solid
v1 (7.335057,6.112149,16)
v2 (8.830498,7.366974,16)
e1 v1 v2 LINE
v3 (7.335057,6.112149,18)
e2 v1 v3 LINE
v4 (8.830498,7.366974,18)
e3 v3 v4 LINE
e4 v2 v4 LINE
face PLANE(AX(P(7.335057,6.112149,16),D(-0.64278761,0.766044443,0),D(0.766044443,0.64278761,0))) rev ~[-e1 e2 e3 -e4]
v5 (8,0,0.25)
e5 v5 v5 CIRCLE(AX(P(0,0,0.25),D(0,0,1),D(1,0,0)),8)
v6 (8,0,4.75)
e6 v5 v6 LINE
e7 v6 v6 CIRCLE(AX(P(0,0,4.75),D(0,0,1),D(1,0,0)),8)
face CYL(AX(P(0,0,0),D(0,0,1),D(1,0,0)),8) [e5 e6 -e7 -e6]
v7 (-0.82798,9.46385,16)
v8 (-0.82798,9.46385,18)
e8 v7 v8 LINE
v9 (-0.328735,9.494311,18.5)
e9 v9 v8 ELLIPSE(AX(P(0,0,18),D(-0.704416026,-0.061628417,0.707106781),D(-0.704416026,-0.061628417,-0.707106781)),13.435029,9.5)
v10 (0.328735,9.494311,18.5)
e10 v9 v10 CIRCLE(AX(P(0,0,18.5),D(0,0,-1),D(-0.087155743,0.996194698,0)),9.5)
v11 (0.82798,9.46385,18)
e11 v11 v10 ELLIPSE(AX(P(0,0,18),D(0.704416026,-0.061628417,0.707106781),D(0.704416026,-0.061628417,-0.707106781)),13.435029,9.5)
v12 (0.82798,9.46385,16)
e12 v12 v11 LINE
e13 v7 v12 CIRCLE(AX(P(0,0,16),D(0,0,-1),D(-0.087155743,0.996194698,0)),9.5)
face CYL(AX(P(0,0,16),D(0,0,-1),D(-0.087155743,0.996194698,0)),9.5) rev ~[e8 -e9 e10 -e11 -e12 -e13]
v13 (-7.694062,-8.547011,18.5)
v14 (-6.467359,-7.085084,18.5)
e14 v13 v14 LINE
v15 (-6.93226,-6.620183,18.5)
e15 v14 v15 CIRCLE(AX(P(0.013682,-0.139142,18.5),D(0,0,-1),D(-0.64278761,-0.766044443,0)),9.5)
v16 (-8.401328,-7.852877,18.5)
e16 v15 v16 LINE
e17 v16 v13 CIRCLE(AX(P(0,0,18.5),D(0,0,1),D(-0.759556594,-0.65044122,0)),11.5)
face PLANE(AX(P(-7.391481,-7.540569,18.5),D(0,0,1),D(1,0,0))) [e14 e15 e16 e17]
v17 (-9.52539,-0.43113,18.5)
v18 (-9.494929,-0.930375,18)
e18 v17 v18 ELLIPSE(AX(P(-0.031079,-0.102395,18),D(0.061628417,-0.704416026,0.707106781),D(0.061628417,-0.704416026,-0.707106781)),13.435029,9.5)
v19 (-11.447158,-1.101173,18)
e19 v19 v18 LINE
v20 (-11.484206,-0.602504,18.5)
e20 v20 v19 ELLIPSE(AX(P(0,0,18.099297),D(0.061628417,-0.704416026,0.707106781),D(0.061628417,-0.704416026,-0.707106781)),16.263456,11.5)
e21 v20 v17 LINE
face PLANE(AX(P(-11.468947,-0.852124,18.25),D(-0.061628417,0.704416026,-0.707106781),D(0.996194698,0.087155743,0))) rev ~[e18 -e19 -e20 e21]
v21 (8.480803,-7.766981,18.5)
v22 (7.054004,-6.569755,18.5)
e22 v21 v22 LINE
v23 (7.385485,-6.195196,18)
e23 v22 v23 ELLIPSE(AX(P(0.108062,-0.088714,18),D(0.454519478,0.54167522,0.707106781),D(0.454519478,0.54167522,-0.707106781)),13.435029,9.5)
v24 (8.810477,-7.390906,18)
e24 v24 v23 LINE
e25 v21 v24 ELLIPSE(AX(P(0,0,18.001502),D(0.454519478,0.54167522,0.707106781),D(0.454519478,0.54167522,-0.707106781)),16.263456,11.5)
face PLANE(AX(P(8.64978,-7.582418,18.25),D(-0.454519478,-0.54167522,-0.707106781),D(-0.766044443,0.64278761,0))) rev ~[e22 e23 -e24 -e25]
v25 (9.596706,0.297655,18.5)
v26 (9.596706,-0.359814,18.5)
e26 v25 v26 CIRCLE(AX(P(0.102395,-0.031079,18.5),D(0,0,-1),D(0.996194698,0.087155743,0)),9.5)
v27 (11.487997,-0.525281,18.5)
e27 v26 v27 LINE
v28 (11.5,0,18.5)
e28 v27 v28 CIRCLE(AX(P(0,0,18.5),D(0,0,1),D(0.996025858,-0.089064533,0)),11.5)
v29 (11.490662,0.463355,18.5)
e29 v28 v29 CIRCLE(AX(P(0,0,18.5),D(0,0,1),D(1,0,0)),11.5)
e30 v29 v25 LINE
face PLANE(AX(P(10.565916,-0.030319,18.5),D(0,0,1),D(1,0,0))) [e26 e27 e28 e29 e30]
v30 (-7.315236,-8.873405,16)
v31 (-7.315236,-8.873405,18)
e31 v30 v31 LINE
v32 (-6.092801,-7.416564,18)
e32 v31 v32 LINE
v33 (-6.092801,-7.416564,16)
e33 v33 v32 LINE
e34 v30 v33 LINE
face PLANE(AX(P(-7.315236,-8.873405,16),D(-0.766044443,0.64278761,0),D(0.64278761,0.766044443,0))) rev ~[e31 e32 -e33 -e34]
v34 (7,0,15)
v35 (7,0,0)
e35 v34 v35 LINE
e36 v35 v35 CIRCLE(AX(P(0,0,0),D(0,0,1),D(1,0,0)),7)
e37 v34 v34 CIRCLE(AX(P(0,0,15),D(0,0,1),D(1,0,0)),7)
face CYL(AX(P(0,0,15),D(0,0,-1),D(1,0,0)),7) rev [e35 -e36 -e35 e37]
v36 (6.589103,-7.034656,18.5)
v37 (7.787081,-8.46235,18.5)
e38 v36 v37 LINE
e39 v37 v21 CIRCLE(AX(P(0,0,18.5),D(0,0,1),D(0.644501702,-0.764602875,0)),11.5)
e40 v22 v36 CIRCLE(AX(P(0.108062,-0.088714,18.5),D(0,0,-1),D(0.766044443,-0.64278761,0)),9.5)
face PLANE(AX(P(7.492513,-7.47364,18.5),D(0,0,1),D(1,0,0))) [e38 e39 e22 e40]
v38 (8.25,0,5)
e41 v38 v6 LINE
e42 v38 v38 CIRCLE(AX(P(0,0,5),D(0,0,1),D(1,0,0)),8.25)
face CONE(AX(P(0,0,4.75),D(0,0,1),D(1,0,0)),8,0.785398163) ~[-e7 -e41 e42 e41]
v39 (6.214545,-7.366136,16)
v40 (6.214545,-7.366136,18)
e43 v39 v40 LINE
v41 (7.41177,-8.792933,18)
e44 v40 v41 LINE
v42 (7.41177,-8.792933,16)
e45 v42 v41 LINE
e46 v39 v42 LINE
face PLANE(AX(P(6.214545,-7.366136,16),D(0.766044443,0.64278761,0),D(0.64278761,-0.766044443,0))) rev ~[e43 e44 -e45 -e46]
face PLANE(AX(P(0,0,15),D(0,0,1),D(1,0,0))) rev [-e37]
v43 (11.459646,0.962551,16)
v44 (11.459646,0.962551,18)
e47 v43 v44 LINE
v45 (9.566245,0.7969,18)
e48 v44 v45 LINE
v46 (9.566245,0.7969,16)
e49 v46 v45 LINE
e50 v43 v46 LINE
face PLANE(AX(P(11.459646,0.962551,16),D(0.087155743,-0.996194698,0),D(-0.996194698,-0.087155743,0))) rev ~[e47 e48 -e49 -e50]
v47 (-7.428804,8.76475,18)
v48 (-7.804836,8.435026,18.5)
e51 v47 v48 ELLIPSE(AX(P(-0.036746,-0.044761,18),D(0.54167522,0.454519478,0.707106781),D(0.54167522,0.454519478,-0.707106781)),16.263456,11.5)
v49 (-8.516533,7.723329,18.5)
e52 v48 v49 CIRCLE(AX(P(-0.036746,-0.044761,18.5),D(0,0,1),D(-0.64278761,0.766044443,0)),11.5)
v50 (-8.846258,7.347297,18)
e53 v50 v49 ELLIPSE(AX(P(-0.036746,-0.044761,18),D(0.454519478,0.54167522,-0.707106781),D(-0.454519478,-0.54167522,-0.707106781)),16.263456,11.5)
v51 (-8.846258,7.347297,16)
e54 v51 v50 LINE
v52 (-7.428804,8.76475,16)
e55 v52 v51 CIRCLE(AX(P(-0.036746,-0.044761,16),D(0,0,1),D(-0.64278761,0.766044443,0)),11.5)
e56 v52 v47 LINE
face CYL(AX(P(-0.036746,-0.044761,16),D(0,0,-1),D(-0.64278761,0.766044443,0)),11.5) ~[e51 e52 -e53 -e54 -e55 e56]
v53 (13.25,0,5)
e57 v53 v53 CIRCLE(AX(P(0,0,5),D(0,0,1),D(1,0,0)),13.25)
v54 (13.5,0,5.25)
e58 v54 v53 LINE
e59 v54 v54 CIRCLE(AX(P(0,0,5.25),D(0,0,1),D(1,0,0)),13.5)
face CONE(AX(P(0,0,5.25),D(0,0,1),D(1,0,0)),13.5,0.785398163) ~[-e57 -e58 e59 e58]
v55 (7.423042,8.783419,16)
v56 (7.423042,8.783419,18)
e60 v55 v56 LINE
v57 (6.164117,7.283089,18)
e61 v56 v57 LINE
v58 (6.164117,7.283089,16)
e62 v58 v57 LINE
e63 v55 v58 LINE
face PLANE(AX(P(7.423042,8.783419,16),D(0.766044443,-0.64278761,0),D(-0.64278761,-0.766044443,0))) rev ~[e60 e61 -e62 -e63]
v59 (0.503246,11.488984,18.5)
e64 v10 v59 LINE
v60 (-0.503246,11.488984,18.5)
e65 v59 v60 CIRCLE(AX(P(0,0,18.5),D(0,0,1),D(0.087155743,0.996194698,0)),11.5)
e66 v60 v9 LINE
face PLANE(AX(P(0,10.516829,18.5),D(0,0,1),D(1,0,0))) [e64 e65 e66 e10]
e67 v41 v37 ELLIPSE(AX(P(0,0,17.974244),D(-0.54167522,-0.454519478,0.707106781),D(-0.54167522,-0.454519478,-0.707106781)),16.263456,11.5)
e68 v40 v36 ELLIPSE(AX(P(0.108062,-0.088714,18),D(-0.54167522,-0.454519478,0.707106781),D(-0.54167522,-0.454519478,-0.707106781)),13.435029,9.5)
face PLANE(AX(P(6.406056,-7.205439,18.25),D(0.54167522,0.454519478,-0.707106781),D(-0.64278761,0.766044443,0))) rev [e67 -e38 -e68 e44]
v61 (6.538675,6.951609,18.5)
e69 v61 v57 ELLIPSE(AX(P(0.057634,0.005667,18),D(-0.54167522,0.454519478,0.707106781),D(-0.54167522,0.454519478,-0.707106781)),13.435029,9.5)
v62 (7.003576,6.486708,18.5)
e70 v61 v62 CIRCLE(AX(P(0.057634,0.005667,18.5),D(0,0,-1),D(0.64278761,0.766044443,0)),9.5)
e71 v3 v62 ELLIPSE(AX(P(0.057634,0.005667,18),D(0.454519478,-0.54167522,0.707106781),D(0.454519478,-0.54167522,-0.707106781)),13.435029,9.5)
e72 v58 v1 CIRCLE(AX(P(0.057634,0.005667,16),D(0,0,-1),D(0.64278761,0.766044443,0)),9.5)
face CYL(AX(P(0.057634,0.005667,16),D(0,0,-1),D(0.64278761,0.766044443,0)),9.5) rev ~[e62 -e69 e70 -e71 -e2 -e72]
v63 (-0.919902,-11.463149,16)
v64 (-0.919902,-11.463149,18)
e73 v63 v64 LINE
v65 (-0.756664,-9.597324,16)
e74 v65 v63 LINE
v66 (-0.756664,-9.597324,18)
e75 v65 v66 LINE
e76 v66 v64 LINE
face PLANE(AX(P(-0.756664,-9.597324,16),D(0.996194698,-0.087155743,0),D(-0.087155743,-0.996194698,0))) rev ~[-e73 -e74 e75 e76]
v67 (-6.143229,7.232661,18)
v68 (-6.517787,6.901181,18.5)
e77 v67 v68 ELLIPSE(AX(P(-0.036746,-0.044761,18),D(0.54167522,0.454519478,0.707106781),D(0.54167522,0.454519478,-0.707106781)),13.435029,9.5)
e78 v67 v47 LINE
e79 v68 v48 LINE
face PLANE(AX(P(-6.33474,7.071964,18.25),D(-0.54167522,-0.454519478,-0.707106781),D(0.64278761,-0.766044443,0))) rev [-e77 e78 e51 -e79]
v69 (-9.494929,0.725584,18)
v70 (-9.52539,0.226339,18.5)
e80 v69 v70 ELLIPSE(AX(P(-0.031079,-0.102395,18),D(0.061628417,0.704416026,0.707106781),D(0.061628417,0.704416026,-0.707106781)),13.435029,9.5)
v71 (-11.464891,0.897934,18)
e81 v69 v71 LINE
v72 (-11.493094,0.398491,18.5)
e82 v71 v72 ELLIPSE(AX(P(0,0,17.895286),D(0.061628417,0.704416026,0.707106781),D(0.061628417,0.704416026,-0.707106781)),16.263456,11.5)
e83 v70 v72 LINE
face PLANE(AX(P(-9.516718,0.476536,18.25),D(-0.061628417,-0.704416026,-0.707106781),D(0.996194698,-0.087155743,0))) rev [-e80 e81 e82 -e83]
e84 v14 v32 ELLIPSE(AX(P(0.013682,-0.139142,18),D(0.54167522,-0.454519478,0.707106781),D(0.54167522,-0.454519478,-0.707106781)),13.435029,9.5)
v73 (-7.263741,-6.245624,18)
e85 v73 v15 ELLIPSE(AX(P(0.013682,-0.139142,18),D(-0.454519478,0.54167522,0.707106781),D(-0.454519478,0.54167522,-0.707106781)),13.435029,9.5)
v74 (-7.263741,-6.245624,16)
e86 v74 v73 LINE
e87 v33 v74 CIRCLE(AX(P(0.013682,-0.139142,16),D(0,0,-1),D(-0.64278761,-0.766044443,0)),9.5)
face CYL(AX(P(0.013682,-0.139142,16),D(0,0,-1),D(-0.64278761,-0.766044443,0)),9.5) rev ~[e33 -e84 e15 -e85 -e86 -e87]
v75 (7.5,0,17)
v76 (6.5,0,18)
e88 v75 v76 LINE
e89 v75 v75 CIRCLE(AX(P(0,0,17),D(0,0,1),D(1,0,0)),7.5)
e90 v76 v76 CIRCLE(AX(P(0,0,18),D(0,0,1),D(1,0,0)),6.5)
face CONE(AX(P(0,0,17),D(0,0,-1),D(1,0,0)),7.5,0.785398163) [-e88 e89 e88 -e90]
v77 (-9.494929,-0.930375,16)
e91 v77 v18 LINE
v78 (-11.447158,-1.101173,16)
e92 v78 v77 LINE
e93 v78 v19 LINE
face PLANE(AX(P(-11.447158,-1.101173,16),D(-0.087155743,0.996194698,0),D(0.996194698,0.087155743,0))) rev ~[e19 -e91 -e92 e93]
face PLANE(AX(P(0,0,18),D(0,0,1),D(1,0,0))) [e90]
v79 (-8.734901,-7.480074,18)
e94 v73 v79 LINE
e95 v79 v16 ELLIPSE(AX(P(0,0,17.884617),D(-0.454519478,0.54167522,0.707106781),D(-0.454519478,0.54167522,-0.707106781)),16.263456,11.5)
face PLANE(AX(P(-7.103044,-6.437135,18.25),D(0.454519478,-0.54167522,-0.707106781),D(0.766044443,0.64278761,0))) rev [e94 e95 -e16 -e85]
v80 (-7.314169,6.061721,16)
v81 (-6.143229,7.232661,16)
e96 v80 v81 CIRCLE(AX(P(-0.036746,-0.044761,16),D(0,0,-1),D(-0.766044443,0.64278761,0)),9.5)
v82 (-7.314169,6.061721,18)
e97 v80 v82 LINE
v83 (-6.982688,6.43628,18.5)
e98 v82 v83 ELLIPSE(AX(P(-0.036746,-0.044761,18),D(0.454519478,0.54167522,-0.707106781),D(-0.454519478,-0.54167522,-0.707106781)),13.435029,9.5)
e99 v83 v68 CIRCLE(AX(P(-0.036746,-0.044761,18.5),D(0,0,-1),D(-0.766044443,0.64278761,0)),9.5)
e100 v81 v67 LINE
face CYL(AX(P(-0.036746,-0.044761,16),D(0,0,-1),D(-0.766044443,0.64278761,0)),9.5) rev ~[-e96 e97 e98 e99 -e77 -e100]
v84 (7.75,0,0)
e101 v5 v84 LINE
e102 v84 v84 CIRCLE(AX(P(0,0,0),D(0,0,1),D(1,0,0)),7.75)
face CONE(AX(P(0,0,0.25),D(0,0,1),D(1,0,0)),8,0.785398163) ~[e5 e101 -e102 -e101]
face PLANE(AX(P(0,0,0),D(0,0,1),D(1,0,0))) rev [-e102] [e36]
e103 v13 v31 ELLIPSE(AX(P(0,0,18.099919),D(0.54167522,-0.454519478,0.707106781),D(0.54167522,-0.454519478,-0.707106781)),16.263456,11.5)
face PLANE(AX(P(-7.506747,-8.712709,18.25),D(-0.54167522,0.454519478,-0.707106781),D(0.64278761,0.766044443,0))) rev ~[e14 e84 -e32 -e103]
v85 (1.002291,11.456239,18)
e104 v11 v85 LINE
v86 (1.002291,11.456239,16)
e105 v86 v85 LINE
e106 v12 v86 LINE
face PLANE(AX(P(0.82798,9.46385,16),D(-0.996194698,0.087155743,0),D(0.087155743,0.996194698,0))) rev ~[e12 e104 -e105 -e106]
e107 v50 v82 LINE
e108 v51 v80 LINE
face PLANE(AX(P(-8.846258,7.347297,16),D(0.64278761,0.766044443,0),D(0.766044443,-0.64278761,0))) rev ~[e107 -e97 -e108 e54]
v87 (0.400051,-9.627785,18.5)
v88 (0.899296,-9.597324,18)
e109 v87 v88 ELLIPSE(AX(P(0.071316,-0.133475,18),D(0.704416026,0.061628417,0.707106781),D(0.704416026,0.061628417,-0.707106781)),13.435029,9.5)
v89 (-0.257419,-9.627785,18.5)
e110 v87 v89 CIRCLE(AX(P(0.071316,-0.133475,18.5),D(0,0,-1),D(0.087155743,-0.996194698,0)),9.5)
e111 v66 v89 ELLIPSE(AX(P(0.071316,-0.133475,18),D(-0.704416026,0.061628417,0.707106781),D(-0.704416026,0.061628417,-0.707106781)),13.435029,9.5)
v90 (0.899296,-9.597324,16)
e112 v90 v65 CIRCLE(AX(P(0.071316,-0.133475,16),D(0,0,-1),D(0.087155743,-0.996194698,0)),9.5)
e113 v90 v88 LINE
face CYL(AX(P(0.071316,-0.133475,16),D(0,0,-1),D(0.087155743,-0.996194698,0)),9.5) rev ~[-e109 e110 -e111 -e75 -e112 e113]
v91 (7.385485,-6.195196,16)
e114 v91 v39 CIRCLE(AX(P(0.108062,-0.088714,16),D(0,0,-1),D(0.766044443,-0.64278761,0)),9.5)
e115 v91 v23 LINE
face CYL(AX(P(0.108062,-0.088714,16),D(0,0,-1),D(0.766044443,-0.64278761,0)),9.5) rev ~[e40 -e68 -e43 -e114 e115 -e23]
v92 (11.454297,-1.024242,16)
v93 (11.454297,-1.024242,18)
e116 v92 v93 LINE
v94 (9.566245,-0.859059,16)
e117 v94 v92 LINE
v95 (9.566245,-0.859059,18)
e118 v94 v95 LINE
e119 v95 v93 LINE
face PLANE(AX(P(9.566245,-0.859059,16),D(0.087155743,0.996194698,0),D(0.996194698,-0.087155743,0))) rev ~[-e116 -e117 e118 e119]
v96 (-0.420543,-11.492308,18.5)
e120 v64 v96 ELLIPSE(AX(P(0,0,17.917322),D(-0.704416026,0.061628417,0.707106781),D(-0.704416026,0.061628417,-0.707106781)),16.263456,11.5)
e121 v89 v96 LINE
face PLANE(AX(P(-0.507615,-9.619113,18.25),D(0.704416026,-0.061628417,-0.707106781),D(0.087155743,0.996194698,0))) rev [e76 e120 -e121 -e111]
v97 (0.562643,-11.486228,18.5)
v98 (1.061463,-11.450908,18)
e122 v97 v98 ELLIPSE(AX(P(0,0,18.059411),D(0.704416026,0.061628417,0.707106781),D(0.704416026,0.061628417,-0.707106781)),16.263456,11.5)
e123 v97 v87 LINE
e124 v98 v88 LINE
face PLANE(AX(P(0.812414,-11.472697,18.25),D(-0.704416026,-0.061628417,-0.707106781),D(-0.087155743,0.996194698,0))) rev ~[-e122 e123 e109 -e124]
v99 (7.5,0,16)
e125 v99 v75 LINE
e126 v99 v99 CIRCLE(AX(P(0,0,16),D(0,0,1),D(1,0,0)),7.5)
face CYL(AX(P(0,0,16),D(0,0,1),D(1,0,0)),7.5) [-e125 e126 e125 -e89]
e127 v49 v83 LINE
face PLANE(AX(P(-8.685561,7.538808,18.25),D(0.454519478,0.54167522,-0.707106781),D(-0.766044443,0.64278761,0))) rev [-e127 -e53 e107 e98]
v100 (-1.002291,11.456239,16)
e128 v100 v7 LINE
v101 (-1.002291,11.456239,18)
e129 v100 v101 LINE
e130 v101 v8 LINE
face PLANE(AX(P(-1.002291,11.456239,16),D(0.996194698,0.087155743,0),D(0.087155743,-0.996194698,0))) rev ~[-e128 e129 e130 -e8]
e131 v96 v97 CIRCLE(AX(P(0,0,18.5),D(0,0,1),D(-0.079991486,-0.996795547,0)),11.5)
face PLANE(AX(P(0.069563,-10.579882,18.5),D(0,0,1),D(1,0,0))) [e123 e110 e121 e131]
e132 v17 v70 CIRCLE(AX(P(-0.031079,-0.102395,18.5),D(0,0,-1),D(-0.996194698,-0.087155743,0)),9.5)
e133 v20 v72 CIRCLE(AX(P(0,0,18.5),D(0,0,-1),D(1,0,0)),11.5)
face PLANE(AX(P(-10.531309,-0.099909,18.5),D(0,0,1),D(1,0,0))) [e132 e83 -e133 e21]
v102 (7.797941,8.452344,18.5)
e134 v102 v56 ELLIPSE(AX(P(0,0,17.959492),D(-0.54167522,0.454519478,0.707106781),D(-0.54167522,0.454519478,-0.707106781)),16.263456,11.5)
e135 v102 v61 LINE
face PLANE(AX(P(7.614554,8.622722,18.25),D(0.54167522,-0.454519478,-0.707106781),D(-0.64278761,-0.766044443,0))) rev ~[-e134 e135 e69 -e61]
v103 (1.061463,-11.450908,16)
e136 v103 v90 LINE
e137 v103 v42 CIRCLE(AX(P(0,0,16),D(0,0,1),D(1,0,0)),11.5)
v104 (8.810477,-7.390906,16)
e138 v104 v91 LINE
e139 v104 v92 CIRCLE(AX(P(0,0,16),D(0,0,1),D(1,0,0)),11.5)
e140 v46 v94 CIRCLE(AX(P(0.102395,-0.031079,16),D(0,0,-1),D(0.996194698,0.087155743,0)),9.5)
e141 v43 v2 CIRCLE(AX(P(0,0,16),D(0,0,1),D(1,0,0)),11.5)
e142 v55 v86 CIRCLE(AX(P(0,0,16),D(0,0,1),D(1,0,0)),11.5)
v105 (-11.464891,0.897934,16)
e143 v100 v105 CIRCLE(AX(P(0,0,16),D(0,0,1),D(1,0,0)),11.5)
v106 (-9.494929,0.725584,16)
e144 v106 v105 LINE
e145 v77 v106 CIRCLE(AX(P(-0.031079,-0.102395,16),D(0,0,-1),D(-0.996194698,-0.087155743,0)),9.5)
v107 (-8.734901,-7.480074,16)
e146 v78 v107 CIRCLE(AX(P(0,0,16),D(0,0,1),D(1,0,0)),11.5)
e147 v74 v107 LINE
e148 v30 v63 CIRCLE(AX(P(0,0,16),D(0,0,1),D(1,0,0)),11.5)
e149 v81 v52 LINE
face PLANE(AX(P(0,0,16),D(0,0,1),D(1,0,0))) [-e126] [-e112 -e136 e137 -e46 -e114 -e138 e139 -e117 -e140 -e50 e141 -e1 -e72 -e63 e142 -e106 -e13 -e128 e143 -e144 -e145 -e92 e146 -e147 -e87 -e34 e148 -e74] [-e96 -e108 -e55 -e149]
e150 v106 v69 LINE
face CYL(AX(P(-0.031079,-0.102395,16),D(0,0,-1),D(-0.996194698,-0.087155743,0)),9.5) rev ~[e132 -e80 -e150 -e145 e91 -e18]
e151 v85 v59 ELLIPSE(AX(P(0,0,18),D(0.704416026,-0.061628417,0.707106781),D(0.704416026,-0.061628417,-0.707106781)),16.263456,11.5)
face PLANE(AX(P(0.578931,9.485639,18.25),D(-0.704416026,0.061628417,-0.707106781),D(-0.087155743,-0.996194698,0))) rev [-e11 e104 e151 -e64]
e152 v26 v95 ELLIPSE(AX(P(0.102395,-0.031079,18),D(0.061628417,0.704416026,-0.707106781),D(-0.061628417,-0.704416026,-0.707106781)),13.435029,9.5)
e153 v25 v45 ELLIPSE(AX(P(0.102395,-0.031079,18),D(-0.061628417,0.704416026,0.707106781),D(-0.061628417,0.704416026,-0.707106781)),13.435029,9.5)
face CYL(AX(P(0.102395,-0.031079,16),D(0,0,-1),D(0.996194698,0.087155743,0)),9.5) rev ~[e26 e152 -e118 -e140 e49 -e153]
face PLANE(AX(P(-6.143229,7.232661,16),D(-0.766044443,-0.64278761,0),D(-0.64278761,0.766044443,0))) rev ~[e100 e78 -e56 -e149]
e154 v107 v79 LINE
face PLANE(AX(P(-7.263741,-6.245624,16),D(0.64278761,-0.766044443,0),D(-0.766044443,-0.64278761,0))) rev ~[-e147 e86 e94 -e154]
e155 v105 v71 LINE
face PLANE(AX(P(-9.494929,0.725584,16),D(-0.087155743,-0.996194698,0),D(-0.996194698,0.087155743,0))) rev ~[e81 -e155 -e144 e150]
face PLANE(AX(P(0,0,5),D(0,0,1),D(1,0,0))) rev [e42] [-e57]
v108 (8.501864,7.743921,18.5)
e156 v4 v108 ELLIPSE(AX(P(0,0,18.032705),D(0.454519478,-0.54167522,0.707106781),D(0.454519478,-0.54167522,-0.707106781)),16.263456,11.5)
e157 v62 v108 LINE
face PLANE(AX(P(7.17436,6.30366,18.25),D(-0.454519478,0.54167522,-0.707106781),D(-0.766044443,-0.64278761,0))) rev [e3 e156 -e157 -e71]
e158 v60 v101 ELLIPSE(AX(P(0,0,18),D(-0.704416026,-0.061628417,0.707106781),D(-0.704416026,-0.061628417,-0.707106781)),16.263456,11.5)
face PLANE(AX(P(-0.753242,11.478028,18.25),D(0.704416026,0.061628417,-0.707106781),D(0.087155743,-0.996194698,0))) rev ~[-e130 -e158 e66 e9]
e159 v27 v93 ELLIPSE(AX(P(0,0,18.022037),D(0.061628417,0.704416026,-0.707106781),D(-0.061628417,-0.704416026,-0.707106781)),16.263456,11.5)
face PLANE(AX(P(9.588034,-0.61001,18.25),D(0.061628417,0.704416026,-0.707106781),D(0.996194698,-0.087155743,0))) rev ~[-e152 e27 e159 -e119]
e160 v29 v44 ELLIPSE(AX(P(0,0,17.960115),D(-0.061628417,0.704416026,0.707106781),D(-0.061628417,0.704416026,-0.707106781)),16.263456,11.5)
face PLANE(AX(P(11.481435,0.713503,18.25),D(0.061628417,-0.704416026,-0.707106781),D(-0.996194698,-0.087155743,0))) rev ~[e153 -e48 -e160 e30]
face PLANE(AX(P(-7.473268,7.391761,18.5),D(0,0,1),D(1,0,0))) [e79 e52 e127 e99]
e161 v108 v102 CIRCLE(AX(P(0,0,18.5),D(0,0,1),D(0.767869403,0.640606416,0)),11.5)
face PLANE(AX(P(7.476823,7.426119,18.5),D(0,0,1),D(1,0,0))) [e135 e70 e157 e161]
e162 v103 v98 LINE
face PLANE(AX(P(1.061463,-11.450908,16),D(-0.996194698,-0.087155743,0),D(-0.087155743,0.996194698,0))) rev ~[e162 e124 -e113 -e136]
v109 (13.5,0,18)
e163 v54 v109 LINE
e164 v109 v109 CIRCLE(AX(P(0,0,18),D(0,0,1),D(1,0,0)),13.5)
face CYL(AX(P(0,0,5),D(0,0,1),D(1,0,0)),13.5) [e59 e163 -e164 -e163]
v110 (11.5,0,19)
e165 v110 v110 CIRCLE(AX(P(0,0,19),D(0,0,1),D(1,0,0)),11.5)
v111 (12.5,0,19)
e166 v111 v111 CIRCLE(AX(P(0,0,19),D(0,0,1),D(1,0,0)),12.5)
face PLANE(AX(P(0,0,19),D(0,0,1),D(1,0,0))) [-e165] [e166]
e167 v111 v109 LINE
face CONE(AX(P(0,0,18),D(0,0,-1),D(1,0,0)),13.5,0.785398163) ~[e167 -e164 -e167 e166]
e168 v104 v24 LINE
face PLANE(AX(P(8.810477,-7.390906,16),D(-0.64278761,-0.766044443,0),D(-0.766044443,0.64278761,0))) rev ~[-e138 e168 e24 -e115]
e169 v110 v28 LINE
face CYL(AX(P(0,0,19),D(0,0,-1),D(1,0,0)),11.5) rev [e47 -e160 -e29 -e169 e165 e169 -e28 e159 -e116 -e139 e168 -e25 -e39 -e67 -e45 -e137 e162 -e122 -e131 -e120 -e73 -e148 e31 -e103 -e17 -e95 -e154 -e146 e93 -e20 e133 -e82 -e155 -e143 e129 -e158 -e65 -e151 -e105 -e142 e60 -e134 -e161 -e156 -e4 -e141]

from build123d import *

# Parameters (mm, degrees)
F3_DEPTH = 2.5
F4_SIZE  = 1
F5_SIZE  = 0.5
F6_SIZE  = 0.25


# Not quite as in the source:
# - a feature names something its author has since deleted; it is built from what else it names


with BuildPart() as f1:
    # F0 (on Front) → F1 (revolve)
    with BuildSketch(Plane.XZ):
        Polygon((7, 15), (7, 0), (8, 0), (8, 5), (13.5, 5), (13.5, 19), (11.5, 19), (11.5, 16), (7.5, 16), (7.5, 18), (0, 18), (0, 15), align=None)
    revolve(axis=Axis((0, 0, 16.5), (0, 0, 1)))

    # F2 (on face) → F3 (join)
    with BuildSketch(Plane.XY.offset(16)):
        with BuildLine():
            Line((0.8279795561, 9.4638496319), (1.0022910416, 11.4562390281))
            ThreePointArc((1.0022910416, 11.4562390281), (0, 11.5), (-1.0022910416, 11.4562390281))
            Line((-1.0022910416, 11.4562390281), (-0.8279795561, 9.4638496319))
            ThreePointArc((-0.8279795561, 9.4638496319), (0, 9.5), (0.8279795561, 9.4638496319))
        make_face()
        with BuildLine():
            ThreePointArc((8.8304981344, 7.3669737816), (8.1575715841, 8.1058019869), (7.4230424297, 8.7834185308))
            Line((7.4230424297, 8.7834185308), (6.1641167123, 7.2830892843))
            ThreePointArc((6.1641167123, 7.2830892843), (6.7751488416, 6.723181496), (7.3350566299, 6.1121493667))
            Line((7.3350566299, 6.1121493667), (8.8304981344, 7.3669737816))
        make_face()
        with BuildLine():
            ThreePointArc((11.5, 0), (11.4899071638, 0.4816984201), (11.4596463708, 0.9625513265))
            Line((11.4596463708, 0.9625513265), (9.5662449685, 0.7969001683))
            ThreePointArc((9.5662449685, 0.7969001683), (9.6023953367, -0.0310793878), (9.5662449685, -0.8590589439))
            Line((9.5662449685, -0.8590589439), (11.4542973626, -1.0242421245))
            ThreePointArc((11.4542973626, -1.0242421245), (11.4885686591, -0.5126306323), (11.5, 0))
        make_face()
        with BuildLine():
            ThreePointArc((7.4117695743, -8.7929330588), (8.141359766, -8.1220847792), (8.810476783, -7.3909064976))
            Line((8.810476783, -7.3909064976), (7.385484621, -6.1951961001))
            ThreePointArc((7.385484621, -6.1951961001), (6.8255768326, -6.8062282293), (6.2145447034, -7.3661360177))
            Line((6.2145447034, -7.3661360177), (7.4117695743, -8.7929330588))
        make_face()
        with BuildLine():
            Line((-0.7566636072, -9.5973243563), (-0.9199020931, -11.4631487881))
            ThreePointArc((-0.9199020931, -11.4631487881), (0.0710446065, -11.4997805485), (1.0614630688, -11.450908093))
            Line((1.0614630688, -11.450908093), (0.899295505, -9.5973243563))
            ThreePointArc((0.899295505, -9.5973243563), (0.0713159489, -9.6334747244), (-0.7566636072, -9.5973243563))
        make_face()
        with BuildLine():
            Line((-7.263740681, -6.2456240912), (-8.7349008301, -7.4800740296))
            ThreePointArc((-8.7349008301, -7.4800740296), (-8.0552507812, -8.2074926044), (-7.3152358724, -8.8734054416))
            Line((-7.3152358724, -8.8734054416), (-6.0928007634, -7.4165640088))
            ThreePointArc((-6.0928007634, -7.4165640088), (-6.7038328927, -6.8566562204), (-7.263740681, -6.2456240912))
        make_face()
        with BuildLine():
            Line((-9.4949290196, 0.7255842194), (-11.464890553, 0.8979335212))
            ThreePointArc((-11.464890553, 0.8979335212), (-11.4995475928, -0.1020056943), (-11.4471576619, -1.1011727676))
            Line((-11.4471576619, -1.1011727676), (-9.4949290196, -0.9303748928))
            ThreePointArc((-9.4949290196, -0.9303748928), (-9.5310793878, -0.1023953367), (-9.4949290196, 0.7255842194))
        make_face()
        with BuildLine():
            ThreePointArc((-11.4471576619, -1.1011727676), (-11.4995475928, -0.1020056943), (-11.464890553, 0.8979335212))
            Line((-11.464890553, 0.8979335212), (-11.4873184158, 0.8998957049))
            ThreePointArc((-11.4873184158, 0.8998957049), (-11.5310793878, -0.1023953367), (-11.4873184158, -1.1046863783))
            Line((-11.4873184158, -1.1046863783), (-11.4471576619, -1.1011727676))
        make_face()
        with BuildLine():
            Line((-6.1432287545, 7.2326612933), (-7.4288039739, 8.7647501795))
            ThreePointArc((-7.4288039739, 8.7647501795), (-8.1684744461, 8.0869670673), (-8.8462575583, 7.347296595))
            Line((-8.8462575583, 7.347296595), (-7.3141686721, 6.0617213757))
            ThreePointArc((-7.3141686721, 6.0617213757), (-6.7542608837, 6.6727535049), (-6.1432287545, 7.2326612933))
        make_face()
    extrude(amount=F3_DEPTH)

    # F4
    f4_edges = [f1.edges().sort_by_distance(p)[0] for p in [
        (-13.5, 0, 19),
        (-7.5, 0, 18),
    ]]
    chamfer(f4_edges, length=F4_SIZE)

    # F5
    f5_edges = [f1.edges().sort_by_distance(p)[0] for p in [
        (-10.471043, -1.015774, 18.5),
        (-10.47991, 0.811759, 18.5),
        (-8.080213, 6.704509, 18.5),
        (-6.786016, 7.998706, 18.5),
        (-0.915135, 10.460044, 18.5),
        (0.915135, 10.460044, 18.5),
        (-6.704018, -8.144985, 18.5),
        (-7.999321, -6.862849, 18.5),
        (0.980379, -10.524116, 18.5),
        (-0.838283, -10.530237, 18.5),
        (8.097981, -6.793051, 18.5),
        (6.813157, -8.079535, 18.5),
        (10.512946, 0.879726, 18.5),
        (10.510271, -0.941651, 18.5),
        (8.082777, 6.739562, 18.5),
        (6.79358, 8.033254, 18.5),
    ]]
    chamfer(f5_edges, length=F5_SIZE)

    # F6
    f6_edges = [f1.edges().sort_by_distance(p)[0] for p in [
        (-13.5, 0, 5),
        (-8, 0, 5),
        (-8, 0, 0),
    ]]
    chamfer(f6_edges, length=F6_SIZE)


solid = f1.part
